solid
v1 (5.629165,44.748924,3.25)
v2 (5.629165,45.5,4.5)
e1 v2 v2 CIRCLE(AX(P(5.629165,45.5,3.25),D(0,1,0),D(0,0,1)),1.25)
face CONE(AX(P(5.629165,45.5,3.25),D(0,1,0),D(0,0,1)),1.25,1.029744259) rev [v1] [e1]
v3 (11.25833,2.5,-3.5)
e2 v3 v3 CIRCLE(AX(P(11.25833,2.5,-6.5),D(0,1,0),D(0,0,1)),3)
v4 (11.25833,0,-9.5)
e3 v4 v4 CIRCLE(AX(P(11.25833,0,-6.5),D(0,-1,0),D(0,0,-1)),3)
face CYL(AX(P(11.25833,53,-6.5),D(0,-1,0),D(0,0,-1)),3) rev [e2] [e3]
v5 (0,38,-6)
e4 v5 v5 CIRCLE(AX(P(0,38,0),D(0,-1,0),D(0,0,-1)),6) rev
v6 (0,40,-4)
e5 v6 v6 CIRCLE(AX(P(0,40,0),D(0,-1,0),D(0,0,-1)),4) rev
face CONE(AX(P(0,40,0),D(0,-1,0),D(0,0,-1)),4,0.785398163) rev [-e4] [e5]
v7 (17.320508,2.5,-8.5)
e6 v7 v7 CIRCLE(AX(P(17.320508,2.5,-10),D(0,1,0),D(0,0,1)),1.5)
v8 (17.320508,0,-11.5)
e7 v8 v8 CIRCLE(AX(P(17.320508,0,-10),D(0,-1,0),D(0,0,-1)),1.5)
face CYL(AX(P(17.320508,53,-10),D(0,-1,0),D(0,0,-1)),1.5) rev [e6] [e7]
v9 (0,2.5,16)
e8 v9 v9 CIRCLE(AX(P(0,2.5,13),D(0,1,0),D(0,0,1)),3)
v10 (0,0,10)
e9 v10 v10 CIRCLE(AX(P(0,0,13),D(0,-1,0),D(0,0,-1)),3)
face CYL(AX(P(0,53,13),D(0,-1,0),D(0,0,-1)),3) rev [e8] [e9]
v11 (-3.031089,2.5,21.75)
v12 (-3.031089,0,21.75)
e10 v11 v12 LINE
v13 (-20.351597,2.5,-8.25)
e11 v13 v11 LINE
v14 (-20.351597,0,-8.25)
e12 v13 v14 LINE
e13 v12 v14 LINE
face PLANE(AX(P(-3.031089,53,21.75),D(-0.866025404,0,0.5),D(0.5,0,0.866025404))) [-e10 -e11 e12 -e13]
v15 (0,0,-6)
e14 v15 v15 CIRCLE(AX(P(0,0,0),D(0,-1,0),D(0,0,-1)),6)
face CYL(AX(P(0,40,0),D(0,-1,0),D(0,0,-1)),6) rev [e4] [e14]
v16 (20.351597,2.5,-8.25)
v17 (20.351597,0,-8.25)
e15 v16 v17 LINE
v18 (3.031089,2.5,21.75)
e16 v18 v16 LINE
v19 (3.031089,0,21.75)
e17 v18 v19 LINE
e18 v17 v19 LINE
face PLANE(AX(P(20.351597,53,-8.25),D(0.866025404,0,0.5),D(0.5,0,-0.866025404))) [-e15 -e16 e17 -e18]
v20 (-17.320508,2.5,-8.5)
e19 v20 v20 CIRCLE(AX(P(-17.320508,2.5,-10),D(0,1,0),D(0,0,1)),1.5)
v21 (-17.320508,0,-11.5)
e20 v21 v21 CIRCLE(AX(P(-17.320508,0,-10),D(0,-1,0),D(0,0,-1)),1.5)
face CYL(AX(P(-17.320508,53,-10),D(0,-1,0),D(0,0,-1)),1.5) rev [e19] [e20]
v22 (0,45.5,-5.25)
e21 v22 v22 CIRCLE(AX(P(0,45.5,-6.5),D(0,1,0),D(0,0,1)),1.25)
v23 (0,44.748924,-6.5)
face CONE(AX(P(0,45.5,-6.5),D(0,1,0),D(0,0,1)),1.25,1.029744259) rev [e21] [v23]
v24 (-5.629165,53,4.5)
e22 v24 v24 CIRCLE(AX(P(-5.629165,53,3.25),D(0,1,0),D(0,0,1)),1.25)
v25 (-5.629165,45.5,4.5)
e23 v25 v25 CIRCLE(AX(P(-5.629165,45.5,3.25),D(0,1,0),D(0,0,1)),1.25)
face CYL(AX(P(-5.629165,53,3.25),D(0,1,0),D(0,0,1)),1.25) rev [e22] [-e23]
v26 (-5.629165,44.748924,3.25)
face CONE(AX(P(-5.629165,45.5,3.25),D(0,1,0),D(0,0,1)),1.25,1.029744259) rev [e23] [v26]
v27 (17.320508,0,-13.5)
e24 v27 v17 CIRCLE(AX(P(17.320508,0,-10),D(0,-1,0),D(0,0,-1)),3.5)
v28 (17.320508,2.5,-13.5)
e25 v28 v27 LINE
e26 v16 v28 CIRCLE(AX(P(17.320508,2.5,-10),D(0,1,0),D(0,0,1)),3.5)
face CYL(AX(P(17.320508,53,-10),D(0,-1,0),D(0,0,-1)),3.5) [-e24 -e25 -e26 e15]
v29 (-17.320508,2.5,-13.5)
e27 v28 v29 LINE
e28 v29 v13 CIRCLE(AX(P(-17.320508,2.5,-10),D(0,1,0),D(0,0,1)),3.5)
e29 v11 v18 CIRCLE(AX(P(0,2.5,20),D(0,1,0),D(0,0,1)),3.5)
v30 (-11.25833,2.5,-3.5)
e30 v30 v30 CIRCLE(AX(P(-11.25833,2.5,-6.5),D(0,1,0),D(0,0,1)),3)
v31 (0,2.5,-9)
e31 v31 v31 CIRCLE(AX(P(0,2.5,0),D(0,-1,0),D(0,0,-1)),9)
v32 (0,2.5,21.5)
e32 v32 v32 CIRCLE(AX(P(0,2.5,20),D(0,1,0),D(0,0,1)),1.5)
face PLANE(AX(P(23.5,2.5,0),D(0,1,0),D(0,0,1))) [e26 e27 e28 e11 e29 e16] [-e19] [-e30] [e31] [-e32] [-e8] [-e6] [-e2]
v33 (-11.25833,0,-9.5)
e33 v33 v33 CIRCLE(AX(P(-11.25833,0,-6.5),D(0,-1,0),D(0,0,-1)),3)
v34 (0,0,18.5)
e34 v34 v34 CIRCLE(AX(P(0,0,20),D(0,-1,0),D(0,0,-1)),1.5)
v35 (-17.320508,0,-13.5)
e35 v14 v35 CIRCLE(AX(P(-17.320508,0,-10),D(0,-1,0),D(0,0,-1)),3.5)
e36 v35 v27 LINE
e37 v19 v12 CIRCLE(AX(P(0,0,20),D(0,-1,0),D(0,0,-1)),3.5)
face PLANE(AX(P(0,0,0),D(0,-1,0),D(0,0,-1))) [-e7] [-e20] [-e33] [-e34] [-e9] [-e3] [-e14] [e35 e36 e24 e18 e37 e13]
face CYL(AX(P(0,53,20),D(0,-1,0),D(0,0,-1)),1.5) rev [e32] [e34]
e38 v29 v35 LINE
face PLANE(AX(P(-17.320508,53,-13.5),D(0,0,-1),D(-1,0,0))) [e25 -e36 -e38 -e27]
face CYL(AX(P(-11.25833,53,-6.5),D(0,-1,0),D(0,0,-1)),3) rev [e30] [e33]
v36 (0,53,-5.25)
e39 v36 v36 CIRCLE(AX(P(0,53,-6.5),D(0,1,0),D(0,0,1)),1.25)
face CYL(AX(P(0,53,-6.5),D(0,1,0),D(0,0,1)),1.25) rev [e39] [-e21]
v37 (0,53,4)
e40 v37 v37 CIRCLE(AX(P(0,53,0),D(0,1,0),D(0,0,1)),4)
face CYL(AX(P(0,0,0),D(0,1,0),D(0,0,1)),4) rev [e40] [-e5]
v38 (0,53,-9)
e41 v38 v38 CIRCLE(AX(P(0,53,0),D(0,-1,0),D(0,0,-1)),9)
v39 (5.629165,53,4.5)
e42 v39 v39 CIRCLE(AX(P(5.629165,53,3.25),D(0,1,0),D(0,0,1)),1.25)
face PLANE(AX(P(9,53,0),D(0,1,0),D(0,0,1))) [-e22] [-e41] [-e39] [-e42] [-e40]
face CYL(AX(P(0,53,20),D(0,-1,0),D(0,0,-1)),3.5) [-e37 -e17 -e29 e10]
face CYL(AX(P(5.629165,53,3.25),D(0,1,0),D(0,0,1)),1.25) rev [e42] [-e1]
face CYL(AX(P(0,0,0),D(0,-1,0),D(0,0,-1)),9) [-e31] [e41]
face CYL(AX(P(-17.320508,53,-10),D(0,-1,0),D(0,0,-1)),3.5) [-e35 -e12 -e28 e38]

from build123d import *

# Parameters (mm, degrees)
SKETCH_9_OUTSIDE_W     = 66.002
SKETCH_9_OUTSIDE_H     = 66.002
SKETCH_9_OUTSIDE_R     = 1.5
SKETCH_9_OUTSIDE_R_2   = 3
CUT_EXTRUDE_2_DEPTH    = 63.557973113
HOLE_WIZARD_M3_1_D     = 2.5
HOLE_WIZARD_M3_1_DEPTH = 7.5
HOLE_WIZARD_M3_1_TIP   = 0.751075774
SKETCH_10_R            = 4
CUT_EXTRUDE_3_DEPTH    = 62.601489889
SKETCH_15_R            = 6
CUT_EXTRUDE_4_DEPTH    = 40
CHAMFER_1_SIZE         = 2


with BuildPart() as part:
    # 草图2 → 旋转1 (revolve)
    with BuildSketch(Plane.XY, mode=Mode.PRIVATE) as revolve_1_sk:
        Polygon((0, 0), (23.5, 0), (23.5, 2.5), (9, 2.5), (9, 53), (0, 53), align=None)
    revolve(revolve_1_sk.sketch.rotate(Axis((0, 0, 0), (0, 1, 0)), 90), axis=Axis((0, 0, 0), (0, 1, 0)))

    # 草图9 outside → 切除-拉伸2 (cut, through all)
    # profile 1 of 7: a face of its own
    with BuildSketch(Plane.XZ):
        Rectangle(SKETCH_9_OUTSIDE_W, SKETCH_9_OUTSIDE_H)
        with BuildLine():
            Line((-3.031088913, 21.75), (-20.351596989, -8.25))
            ThreePointArc((-20.351596989, -8.25), (-20.351596989, -11.75), (-17.320508076, -13.5))
            Line((-17.320508076, -13.5), (17.320508076, -13.5))
            ThreePointArc((17.320508076, -13.5), (20.351596989, -11.75), (20.351596989, -8.25))
            Line((20.351596989, -8.25), (3.031088913, 21.75))
            ThreePointArc((3.031088913, 21.75), (0, 23.5), (-3.031088913, 21.75))
        make_face(mode=Mode.SUBTRACT)
    # profile 2 of 7: a face of its own
    with BuildSketch(Plane.XZ):
        with Locations(Location((0, 20, 0), (0, 0, 270))):
            Circle(SKETCH_9_OUTSIDE_R)
    # profile 3 of 7: a face of its own
    with BuildSketch(Plane.XZ):
        with Locations(Location((17.320508076, -10, 0), (0, 0, 270))):
            Circle(SKETCH_9_OUTSIDE_R)
    # profile 4 of 7: a face of its own
    with BuildSketch(Plane.XZ):
        with Locations(Location((-17.320508076, -10, 0), (0, 0, 270))):
            Circle(SKETCH_9_OUTSIDE_R)
    # profile 5 of 7: a face of its own
    with BuildSketch(Plane.XZ):
        with Locations(Location((0, 13, 0), (0, 0, 270))):
            Circle(SKETCH_9_OUTSIDE_R_2)
    # profile 6 of 7: a face of its own
    with BuildSketch(Plane.XZ):
        with Locations(Location((11.258330249, -6.5, 0), (0, 0, 270))):
            Circle(SKETCH_9_OUTSIDE_R_2)
    # profile 7 of 7: a face of its own
    with BuildSketch(Plane.XZ):
        with Locations(Location((-11.258330249, -6.5, 0), (0, 0, 270))):
            Circle(SKETCH_9_OUTSIDE_R_2)
    extrude(amount=-CUT_EXTRUDE_2_DEPTH, mode=Mode.SUBTRACT)

    # M3 螺纹孔1
    with Locations(Plane(origin=(0, 53, 0), x_dir=(1, 0, 0), z_dir=(0, 1, 0))):
        with Locations((-5.629165125, -3.25), (0, 6.5), (5.629165125, -3.25)):
            Hole(HOLE_WIZARD_M3_1_D / 2, depth=HOLE_WIZARD_M3_1_DEPTH)
            with Locations((0, 0, -(HOLE_WIZARD_M3_1_DEPTH + HOLE_WIZARD_M3_1_TIP / 2))):  # 118° drill point
                Cone(0, HOLE_WIZARD_M3_1_D / 2, HOLE_WIZARD_M3_1_TIP, mode=Mode.SUBTRACT)

    # 草图10 → 切除-拉伸3 (cut, through all)
    with BuildSketch(Plane(origin=(0, 53, 0), x_dir=(1, 0, 0), z_dir=(0, 1, 0))):
        with Locations(Location((0, 0, 0), (0, 0, 270))):
            Circle(SKETCH_10_R)
    extrude(amount=-CUT_EXTRUDE_3_DEPTH, mode=Mode.SUBTRACT)

    # 草图15 → 切除-拉伸4 (cut)
    with BuildSketch(Plane.XZ):
        with Locations(Location((0, 0, 0), (0, 0, 270))):
            Circle(SKETCH_15_R)
    extrude(amount=-CUT_EXTRUDE_4_DEPTH, mode=Mode.SUBTRACT)

    # 倒角1
    chamfer_1_edges = [part.edges().sort_by_distance(p)[0] for p in [
        (0, 40, 6),
    ]]
    chamfer(chamfer_1_edges, length=CHAMFER_1_SIZE - 0.0001)  # a hair under: the kernel refuses the full size


solid = part.part
